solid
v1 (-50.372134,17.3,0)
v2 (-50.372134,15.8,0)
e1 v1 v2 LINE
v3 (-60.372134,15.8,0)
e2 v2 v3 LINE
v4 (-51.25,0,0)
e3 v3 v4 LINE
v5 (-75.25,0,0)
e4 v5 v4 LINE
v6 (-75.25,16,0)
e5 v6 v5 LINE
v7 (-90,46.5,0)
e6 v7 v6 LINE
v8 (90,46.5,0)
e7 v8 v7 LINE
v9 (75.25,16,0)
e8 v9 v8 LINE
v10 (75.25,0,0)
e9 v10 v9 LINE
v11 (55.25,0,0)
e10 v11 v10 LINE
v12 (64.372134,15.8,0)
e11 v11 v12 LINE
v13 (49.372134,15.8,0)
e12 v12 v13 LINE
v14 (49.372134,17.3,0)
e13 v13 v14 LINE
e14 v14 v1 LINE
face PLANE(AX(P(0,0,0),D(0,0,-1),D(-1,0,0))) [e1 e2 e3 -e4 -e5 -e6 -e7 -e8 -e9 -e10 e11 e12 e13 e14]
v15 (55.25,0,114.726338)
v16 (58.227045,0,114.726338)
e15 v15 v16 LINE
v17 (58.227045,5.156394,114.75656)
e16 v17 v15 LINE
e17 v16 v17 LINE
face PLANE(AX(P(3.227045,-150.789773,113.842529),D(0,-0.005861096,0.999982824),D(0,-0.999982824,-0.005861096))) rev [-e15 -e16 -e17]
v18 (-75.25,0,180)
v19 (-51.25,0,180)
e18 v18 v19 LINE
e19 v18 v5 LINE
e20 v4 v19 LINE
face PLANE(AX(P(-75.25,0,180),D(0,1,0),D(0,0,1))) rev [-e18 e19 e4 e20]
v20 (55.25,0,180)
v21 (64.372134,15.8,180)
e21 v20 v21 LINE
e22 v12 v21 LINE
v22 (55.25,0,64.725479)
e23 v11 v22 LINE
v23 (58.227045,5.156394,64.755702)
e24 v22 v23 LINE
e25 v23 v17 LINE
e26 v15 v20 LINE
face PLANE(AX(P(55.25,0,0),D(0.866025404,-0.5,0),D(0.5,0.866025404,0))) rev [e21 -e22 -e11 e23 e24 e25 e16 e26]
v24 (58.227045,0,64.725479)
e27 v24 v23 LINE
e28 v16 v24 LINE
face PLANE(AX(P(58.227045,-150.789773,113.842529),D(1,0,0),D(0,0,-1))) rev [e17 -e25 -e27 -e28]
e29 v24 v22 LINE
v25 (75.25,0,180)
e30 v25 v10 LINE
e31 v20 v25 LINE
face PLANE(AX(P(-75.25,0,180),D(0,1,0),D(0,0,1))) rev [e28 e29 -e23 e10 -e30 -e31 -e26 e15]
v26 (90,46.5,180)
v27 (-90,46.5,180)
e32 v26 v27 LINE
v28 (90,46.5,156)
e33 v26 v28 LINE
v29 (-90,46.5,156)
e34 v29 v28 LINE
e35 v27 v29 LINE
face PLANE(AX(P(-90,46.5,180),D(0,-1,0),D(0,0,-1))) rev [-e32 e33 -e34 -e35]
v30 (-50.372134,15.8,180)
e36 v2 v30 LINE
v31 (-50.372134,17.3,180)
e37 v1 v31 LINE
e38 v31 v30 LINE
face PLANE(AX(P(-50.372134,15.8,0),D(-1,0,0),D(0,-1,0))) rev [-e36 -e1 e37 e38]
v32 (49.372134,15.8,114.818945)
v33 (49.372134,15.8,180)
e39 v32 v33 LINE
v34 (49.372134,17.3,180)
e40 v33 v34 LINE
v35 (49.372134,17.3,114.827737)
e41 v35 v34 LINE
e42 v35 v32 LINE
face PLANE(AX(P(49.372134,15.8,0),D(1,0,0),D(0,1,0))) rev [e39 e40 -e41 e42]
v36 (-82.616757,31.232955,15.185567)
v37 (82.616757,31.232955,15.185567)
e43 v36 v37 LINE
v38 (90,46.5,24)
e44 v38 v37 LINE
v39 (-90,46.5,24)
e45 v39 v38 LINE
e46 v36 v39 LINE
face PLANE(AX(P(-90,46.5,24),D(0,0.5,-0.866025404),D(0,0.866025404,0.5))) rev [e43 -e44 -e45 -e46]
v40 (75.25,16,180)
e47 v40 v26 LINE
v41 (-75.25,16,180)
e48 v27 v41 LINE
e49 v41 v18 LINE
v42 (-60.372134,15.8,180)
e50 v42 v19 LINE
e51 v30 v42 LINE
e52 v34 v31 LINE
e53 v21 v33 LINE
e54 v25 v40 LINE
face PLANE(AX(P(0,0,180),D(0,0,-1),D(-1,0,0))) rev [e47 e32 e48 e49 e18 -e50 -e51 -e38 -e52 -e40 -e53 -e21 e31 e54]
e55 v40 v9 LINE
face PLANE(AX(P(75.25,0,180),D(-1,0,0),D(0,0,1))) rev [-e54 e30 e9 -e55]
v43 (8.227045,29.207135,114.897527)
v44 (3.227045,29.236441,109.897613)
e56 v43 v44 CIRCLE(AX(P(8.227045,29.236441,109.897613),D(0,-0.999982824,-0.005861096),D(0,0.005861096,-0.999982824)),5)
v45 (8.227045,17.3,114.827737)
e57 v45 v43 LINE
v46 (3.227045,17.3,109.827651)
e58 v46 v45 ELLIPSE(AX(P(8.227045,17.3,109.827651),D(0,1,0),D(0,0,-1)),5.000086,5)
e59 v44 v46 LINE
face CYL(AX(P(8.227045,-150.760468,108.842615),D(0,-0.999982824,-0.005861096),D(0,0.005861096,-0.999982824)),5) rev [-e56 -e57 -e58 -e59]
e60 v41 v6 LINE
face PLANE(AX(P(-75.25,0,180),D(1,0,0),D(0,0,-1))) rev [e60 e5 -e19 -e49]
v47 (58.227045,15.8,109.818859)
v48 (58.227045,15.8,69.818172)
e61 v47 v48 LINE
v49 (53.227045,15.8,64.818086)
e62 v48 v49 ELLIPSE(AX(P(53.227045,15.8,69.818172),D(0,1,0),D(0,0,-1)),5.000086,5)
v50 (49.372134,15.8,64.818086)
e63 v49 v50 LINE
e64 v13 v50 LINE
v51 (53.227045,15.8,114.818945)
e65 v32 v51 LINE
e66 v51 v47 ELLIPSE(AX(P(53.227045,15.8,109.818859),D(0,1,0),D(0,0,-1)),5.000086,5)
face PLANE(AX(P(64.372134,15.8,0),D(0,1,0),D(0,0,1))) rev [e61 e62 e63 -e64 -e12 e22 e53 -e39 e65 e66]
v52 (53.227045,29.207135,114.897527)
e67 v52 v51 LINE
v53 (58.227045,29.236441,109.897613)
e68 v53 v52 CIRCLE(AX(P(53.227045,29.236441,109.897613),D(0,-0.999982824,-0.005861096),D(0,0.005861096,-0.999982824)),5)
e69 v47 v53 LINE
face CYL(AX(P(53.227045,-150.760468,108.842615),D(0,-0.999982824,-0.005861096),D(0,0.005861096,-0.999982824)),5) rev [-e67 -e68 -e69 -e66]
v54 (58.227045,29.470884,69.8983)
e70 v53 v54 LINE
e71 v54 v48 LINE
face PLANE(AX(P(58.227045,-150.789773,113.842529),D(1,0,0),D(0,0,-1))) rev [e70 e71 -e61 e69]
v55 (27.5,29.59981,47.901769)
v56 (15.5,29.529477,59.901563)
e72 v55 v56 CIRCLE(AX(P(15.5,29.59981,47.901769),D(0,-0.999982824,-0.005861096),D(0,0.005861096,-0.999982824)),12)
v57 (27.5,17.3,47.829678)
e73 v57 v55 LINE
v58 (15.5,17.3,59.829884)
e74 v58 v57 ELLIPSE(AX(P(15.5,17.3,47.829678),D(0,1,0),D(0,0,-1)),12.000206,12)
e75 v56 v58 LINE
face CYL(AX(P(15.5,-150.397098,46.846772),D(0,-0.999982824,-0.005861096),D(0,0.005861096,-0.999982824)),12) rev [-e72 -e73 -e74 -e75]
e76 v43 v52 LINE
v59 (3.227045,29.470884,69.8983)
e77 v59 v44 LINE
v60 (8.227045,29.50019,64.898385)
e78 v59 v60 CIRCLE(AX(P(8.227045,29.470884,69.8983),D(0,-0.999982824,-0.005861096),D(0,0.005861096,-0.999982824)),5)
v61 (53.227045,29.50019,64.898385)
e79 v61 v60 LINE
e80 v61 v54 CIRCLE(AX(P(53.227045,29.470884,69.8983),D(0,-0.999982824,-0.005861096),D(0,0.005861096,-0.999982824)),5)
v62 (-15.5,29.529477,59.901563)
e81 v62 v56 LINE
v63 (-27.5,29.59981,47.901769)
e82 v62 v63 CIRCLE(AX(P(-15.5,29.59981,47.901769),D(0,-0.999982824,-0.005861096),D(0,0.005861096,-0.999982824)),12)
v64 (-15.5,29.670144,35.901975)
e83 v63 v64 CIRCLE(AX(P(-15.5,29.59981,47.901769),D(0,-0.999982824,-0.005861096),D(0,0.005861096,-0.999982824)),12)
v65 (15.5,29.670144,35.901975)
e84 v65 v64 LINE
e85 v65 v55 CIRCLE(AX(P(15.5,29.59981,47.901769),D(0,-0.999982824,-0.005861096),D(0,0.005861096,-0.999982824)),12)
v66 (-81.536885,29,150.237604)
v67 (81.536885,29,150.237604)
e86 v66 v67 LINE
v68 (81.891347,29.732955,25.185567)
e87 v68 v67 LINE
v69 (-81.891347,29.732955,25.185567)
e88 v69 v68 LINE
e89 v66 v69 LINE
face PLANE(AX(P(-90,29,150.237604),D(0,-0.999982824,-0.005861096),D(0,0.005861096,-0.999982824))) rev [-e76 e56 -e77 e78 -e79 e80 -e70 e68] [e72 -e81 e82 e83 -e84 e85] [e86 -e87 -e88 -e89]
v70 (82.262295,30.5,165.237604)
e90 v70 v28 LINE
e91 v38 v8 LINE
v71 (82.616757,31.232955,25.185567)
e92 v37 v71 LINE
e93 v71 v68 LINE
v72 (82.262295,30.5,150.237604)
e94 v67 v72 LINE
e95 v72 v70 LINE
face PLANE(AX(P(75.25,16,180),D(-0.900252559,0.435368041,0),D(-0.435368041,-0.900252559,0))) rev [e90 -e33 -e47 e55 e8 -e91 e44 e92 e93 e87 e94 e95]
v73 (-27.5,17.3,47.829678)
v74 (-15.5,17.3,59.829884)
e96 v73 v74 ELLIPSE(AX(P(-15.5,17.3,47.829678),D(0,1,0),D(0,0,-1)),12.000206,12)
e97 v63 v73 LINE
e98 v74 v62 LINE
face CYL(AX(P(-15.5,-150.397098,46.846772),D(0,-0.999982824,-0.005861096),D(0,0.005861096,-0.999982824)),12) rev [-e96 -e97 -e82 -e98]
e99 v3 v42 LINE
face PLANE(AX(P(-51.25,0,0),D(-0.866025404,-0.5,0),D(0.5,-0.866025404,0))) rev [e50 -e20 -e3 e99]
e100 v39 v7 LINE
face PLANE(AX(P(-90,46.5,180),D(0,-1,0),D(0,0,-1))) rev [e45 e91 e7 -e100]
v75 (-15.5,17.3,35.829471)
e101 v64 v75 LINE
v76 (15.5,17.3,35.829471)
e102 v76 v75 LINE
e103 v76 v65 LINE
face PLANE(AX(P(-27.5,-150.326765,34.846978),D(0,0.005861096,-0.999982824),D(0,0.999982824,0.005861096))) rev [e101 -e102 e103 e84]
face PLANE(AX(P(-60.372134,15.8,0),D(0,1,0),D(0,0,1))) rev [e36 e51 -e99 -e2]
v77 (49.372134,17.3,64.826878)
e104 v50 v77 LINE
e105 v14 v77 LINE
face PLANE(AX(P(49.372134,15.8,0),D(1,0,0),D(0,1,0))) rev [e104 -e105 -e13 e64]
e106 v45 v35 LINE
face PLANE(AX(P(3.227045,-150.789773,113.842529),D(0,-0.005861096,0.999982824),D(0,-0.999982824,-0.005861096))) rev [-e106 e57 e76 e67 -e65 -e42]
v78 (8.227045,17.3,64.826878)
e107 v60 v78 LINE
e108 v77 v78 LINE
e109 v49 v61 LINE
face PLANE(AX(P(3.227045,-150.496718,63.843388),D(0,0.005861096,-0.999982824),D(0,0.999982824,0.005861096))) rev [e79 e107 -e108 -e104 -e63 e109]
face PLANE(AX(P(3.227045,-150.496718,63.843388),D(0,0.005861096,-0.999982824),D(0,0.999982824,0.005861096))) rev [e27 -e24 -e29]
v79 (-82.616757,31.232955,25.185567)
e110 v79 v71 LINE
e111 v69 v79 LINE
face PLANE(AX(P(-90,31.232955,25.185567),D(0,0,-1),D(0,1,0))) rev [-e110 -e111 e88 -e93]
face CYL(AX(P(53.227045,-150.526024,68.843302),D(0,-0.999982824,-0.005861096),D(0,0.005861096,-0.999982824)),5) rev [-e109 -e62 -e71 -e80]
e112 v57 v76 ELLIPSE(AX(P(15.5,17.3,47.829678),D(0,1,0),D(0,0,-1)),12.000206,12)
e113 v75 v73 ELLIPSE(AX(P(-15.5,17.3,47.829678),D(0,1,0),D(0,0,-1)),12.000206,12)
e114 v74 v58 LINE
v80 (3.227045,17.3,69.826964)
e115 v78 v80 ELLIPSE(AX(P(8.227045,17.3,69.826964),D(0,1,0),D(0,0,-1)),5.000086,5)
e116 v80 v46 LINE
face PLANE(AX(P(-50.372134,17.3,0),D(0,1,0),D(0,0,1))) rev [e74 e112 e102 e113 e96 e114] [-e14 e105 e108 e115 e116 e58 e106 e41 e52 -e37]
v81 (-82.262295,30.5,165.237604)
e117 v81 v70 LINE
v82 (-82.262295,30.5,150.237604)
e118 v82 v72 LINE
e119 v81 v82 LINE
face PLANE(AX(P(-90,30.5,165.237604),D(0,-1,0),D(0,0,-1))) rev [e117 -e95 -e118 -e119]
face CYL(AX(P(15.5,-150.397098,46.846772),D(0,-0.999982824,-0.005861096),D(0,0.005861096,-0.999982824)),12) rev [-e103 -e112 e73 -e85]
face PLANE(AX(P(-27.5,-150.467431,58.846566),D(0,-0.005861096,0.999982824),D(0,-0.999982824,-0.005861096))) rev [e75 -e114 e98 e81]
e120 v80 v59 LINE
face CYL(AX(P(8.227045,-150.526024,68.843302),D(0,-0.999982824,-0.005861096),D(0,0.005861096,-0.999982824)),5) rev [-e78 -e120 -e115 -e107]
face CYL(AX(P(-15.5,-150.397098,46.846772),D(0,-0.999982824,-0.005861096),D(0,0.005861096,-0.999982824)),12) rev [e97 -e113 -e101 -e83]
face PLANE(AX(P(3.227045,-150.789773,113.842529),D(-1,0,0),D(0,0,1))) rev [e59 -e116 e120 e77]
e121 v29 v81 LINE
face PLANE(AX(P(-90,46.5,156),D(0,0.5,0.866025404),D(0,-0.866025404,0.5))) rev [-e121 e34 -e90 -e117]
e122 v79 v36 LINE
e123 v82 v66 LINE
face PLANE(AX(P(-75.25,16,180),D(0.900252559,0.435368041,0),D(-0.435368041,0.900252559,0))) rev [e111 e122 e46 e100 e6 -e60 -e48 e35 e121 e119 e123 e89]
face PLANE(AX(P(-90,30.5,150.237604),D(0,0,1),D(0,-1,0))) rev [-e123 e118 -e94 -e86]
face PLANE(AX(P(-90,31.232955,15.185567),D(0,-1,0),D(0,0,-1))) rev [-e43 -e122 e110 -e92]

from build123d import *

# Parameters (mm, degrees)
BOSS_EXTRUDE1_DEPTH = 180
CUT_EXTRUDE1_DEPTH  = 207.548420473
BOSS_EXTRUDE2_DEPTH = 175
CUT_EXTRUDE5_DEPTH  = 180
CUT_EXTRUDE6_DEPTH  = 180
SKETCH7_W           = 55
SKETCH7_H           = 24
CUT_EXTRUDE7_DEPTH  = 180
SKETCH8_W           = 55
SKETCH8_H           = 50
CUT_EXTRUDE8_DEPTH  = 180
FILLET1_R           = 12
FILLET2_R           = 12
FILLET3_R           = 12
FILLET4_R           = 12
FILLET5_R           = 5
FILLET6_R           = 5
FILLET7_R           = 5
FILLET8_R           = 5


with BuildPart() as part:
    # Sketch1 → Boss-Extrude1 (new body)
    with BuildSketch(Plane.XY):
        Polygon((-75.25, 0), (75.25, 0), (75.25, 16), (90, 46.5), (-90, 46.5), (-75.25, 16), align=None)
    extrude(amount=BOSS_EXTRUDE1_DEPTH)

    # Sketch2 → Cut-Extrude1 (cut, through all)
    with BuildSketch(Plane.XY.offset(180)):
        Polygon((-51.25, 0), (-60.372134253, 15.8), (-50.372134253, 15.8), (-50.372134253, 17.3), (49.372134253, 17.3), (49.372134253, 15.8), (64.372134253, 15.8), (55.25, 0), align=None)
    extrude(amount=-CUT_EXTRUDE1_DEPTH, mode=Mode.SUBTRACT)


with BuildPart() as body_2:
    # Sketch3 → Boss-Extrude2 (new body)
    with BuildSketch(Plane.XY.offset(180)):
        Polygon((90, 46.5), (75.25, 16), (90, 16), align=None)
    extrude(amount=-BOSS_EXTRUDE2_DEPTH)


with BuildPart() as cut_extrude5_tool:
    # Sketch5 → Cut-Extrude5 (new body)
    with BuildSketch(Plane(origin=(90, 0, 0), x_dir=(0, 0, -1), z_dir=(1, 0, 0))):
        Polygon((-156, 46.5), (-165.237604307, 30.5), (-150.237604307, 30.5), (-150.237604307, 29), (-25.18556724, 29.732954619), (-25.18556724, 31.232954619), (-15.18556724, 31.232954619), (-24, 46.5), align=None)
    extrude(amount=-CUT_EXTRUDE5_DEPTH)


with BuildPart() as part_1:
    add(part.part)

    # Cut-Extrude5: cut by cut_extrude5_tool
    add(cut_extrude5_tool.part, mode=Mode.SUBTRACT)

    # Sketch7 → Cut-Extrude7 (cut)
    with BuildSketch(Plane(origin=(0, 29.879545719, 0.175129902), x_dir=(1, 0, 0), z_dir=(0, 0.9999828236276607, 0.005861096284045548))):
        with Locations((0, -47.727459023)):
            Rectangle(SKETCH7_W, SKETCH7_H)
    extrude(amount=-CUT_EXTRUDE7_DEPTH, mode=Mode.SUBTRACT)

    # Sketch8 → Cut-Extrude8 (cut)
    with BuildSketch(Plane(origin=(0, 29.879545719, 0.175129902), x_dir=(1, 0, 0), z_dir=(0, 0.9999828236276607, 0.005861096284045548))):
        with Locations((30.72704543, -89.724367276)):
            Rectangle(SKETCH8_W, SKETCH8_H)
    extrude(amount=-CUT_EXTRUDE8_DEPTH, mode=Mode.SUBTRACT)

    # Fillet1
    fillet1_edges = [part_1.edges().sort_by_distance(p)[0] for p in [
        (-27.5, 23.414738665, 59.865723337),
    ]]
    fillet(fillet1_edges, radius=FILLET1_R)

    # Fillet2
    fillet2_edges = [part_1.edges().sort_by_distance(p)[0] for p in [
        (-27.5, 23.485071821, 35.865723333),
    ]]
    fillet(fillet2_edges, radius=FILLET2_R - 0.0001)  # a hair under: the kernel refuses the full size

    # Fillet3
    fillet3_edges = [part_1.edges().sort_by_distance(p)[0] for p in [
        (27.5, 23.414738665, 59.865723337),
    ]]
    fillet(fillet3_edges, radius=FILLET3_R)

    # Fillet4
    fillet4_edges = [part_1.edges().sort_by_distance(p)[0] for p in [
        (27.5, 23.485071821, 35.865723333),
    ]]
    fillet(fillet4_edges, radius=FILLET4_R - 0.0001)  # a hair under: the kernel refuses the full size

    # Fillet5
    fillet5_edges = [part_1.edges().sort_by_distance(p)[0] for p in [
        (58.22704543, 22.650094985, 64.858235693),
    ]]
    fillet(fillet5_edges, radius=FILLET5_R)

    # Fillet6
    fillet6_edges = [part_1.edges().sort_by_distance(p)[0] for p in [
        (3.22704543, 23.400094985, 64.86263159),
    ]]
    fillet(fillet6_edges, radius=FILLET6_R)

    # Fillet7
    fillet7_edges = [part_1.edges().sort_by_distance(p)[0] for p in [
        (3.22704543, 23.253567578, 114.862631598),
    ]]
    fillet(fillet7_edges, radius=FILLET7_R)

    # Fillet8
    fillet8_edges = [part_1.edges().sort_by_distance(p)[0] for p in [
        (58.22704543, 22.503567578, 114.8582357),
    ]]
    fillet(fillet8_edges, radius=FILLET8_R)


with BuildPart() as body_2_1:
    add(body_2.part)

    # Cut-Extrude5: cut by cut_extrude5_tool
    add(cut_extrude5_tool.part, mode=Mode.SUBTRACT)

    # Sketch6 → Cut-Extrude6 (cut)
    with BuildSketch(Plane.XY.offset(180)):
        Polygon((75.25, 16), (90, 46.5), (90, 16), align=None)
    extrude(amount=-CUT_EXTRUDE6_DEPTH, mode=Mode.SUBTRACT)


solid = part_1.part
